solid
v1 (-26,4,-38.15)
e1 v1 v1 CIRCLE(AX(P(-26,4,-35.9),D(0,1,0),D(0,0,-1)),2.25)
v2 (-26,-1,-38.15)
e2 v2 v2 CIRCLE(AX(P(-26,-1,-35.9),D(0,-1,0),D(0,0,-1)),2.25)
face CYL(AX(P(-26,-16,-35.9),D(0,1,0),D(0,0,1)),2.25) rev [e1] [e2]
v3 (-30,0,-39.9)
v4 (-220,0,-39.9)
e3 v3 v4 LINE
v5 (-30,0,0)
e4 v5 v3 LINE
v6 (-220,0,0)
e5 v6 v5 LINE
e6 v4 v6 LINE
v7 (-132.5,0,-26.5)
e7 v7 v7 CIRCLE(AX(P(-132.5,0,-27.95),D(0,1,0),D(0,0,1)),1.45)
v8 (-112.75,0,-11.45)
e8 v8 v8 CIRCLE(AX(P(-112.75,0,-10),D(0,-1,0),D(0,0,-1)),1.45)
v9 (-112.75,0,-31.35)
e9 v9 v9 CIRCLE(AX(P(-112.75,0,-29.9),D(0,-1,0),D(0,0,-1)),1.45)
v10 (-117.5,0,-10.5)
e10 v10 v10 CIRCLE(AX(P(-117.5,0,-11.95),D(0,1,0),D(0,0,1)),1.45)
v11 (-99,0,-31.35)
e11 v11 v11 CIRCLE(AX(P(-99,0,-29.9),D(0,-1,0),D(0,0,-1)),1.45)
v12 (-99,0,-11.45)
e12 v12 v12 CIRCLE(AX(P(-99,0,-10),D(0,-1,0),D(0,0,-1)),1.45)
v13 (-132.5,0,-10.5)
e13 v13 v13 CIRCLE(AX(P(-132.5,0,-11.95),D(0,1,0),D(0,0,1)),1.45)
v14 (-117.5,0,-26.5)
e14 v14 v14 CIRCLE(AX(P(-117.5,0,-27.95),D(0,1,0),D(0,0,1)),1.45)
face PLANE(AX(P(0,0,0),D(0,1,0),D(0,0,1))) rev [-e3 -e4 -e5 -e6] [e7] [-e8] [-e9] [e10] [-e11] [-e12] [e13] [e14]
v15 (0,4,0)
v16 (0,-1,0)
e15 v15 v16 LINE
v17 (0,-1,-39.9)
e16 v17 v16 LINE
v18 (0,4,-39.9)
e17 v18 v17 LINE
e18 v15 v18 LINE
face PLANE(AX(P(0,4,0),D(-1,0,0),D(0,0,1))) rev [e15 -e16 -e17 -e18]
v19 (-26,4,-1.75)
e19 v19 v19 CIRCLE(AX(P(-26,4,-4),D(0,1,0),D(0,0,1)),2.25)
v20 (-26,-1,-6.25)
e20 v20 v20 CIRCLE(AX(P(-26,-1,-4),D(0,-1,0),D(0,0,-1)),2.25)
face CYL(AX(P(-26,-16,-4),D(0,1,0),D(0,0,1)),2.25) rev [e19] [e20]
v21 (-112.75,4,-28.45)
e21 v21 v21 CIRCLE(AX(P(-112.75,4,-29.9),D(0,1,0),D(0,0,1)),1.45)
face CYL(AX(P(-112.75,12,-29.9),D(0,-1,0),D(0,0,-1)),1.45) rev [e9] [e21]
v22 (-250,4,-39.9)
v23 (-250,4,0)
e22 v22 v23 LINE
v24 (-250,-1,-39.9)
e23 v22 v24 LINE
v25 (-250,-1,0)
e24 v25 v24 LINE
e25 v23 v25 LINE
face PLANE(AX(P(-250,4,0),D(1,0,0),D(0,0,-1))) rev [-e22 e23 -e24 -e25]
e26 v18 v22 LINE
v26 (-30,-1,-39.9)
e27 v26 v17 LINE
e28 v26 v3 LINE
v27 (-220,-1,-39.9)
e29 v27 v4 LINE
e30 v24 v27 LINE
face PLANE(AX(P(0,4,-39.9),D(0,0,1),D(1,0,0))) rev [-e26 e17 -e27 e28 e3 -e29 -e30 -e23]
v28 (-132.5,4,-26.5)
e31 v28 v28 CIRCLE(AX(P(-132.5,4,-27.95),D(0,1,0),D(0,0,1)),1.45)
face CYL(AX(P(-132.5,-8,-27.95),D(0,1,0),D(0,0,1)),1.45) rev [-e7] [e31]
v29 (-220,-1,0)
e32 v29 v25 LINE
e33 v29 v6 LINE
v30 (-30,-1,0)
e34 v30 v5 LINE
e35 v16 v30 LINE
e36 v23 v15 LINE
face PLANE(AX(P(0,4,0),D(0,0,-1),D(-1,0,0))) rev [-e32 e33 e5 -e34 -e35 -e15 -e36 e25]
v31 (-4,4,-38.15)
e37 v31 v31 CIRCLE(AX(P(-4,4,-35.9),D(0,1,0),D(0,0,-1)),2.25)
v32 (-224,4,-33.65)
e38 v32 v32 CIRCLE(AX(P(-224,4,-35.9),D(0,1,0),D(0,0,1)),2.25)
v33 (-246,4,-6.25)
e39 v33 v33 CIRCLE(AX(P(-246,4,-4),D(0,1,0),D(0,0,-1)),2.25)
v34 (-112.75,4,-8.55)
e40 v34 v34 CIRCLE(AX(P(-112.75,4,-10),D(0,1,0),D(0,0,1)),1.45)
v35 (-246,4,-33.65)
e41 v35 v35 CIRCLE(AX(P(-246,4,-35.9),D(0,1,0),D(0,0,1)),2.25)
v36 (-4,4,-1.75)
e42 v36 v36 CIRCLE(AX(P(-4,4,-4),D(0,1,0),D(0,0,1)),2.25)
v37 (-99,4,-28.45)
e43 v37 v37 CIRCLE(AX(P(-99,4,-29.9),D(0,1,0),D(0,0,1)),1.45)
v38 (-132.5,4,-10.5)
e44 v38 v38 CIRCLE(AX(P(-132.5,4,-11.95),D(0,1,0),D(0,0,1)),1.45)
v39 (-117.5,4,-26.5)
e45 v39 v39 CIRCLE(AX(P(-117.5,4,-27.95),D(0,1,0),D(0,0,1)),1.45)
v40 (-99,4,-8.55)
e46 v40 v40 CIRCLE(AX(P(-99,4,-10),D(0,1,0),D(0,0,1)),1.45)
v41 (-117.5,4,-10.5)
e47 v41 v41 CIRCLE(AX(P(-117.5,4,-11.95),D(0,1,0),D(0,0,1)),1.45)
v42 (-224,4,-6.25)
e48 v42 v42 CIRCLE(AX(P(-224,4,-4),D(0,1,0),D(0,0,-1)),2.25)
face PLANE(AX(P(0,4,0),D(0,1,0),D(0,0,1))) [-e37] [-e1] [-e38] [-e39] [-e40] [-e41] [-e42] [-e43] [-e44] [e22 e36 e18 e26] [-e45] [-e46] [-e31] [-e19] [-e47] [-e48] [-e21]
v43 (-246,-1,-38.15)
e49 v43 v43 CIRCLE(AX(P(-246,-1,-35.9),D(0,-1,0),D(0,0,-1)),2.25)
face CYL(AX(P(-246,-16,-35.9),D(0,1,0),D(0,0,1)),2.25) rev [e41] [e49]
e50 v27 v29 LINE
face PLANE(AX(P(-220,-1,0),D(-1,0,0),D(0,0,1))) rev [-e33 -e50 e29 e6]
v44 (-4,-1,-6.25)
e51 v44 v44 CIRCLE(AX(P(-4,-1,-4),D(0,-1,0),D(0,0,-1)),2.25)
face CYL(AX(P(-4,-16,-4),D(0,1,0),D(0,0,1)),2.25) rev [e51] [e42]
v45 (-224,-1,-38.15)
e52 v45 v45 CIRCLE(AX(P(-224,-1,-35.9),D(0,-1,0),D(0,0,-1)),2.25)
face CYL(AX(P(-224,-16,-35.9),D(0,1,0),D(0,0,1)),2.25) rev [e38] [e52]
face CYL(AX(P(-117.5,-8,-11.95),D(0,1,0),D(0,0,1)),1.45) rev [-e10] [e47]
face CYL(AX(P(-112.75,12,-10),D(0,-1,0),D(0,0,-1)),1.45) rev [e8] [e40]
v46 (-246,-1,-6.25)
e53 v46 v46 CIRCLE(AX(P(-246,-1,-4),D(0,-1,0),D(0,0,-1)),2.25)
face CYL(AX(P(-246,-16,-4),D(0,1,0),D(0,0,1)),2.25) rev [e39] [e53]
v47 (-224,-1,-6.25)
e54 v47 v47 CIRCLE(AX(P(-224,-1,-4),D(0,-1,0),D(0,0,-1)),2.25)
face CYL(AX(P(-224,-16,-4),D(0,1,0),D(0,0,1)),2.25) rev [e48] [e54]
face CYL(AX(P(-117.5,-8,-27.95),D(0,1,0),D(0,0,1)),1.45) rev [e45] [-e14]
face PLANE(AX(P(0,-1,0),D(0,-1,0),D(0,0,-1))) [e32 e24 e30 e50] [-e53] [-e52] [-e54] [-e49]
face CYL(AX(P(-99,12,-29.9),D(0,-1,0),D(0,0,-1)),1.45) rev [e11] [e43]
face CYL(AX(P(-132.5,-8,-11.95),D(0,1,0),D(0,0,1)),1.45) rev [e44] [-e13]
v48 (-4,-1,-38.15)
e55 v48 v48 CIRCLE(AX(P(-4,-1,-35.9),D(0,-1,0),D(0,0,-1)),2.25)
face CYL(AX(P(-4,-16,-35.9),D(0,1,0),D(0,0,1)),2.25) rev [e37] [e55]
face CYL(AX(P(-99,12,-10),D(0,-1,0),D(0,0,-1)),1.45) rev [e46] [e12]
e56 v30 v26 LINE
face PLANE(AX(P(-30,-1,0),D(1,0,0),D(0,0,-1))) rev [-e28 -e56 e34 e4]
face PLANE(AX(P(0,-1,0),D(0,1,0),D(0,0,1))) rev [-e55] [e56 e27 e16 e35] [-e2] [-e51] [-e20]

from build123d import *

# Parameters (mm, degrees)
SKETCH_1_W          = 250
SKETCH_1_H          = 39.9
EXTRUDE_1_DEPTH     = 4
SKETCH_2_R          = 1.45
CUT_EXTRUDE_1_DEPTH = 12
SKETCH_3_R          = 1.45
CUT_EXTRUDE_2_DEPTH = 12
SKETCH_7_R          = 2.25
CUT_EXTRUDE_6_DEPTH = 20
SKETCH_8_W          = 30
SKETCH_8_H          = 39.9
SKETCH_8_R          = 2.25
EXTRUDE_2_DEPTH     = 1


with BuildPart() as part:
    # 草图1 → 凸台-拉伸1 (new body)
    with BuildSketch(Plane(origin=(0, 0, 0), x_dir=(1, 0, 0), z_dir=(0, 1, 0))):
        with Locations((-125, 19.95)):
            Rectangle(SKETCH_1_W, SKETCH_1_H)
    extrude(amount=EXTRUDE_1_DEPTH)

    # 草图2 → 切除-拉伸1 (cut)
    with BuildSketch(Plane(origin=(0, 4, 0), x_dir=(1, 0, 0), z_dir=(0, 1, 0))):
        with Locations((-132.5, 27.95)):
            Circle(SKETCH_2_R)
        with Locations((-117.5, 27.95)):
            Circle(SKETCH_2_R)
        with Locations((-117.5, 11.95)):
            Circle(SKETCH_2_R)
        with Locations((-132.5, 11.95)):
            Circle(SKETCH_2_R)
    extrude(amount=-CUT_EXTRUDE_1_DEPTH, mode=Mode.SUBTRACT)

    # 草图3 → 切除-拉伸2 (cut)
    with BuildSketch(Plane(origin=(-275.091791604, 0, 105.376222054), x_dir=(-0.9999983055135633, 0, 0.0018409155336922224), z_dir=(0, -1, 0))):
        with Locations((-162.553914397, 115.077169025)):
            Circle(SKETCH_3_R)
        with Locations((-162.590548616, 134.977135305)):
            Circle(SKETCH_3_R)
        with Locations((-176.303891098, 115.051856436)):
            Circle(SKETCH_3_R)
        with Locations((-176.340525317, 134.951822716)):
            Circle(SKETCH_3_R)
    extrude(amount=-CUT_EXTRUDE_2_DEPTH, mode=Mode.SUBTRACT)

    # 草图7 → 切除-拉伸6 (cut)
    with BuildSketch(Plane(origin=(0, 4, 0), x_dir=(1, 0, 0), z_dir=(0, 1, 0))):
        with Locations((-246, 35.9)):
            Circle(SKETCH_7_R)
        with Locations((-224, 35.9)):
            Circle(SKETCH_7_R)
        with Locations((-224, 4)):
            Circle(SKETCH_7_R)
        with Locations((-246, 4)):
            Circle(SKETCH_7_R)
        with Locations((-4, 4)):
            Circle(SKETCH_7_R)
        with Locations((-26, 4)):
            Circle(SKETCH_7_R)
        with Locations((-26, 35.9)):
            Circle(SKETCH_7_R)
        with Locations((-4, 35.9)):
            Circle(SKETCH_7_R)
    extrude(amount=-CUT_EXTRUDE_6_DEPTH, mode=Mode.SUBTRACT)

    # 草图8 → 凸台-拉伸2 (add)
    # profile 1 of 2: a face of its own
    with BuildSketch(Plane.XZ):
        with Locations((-235, -19.95)):
            Rectangle(SKETCH_8_W, SKETCH_8_H)
        with Locations((-224, -35.9)):
            Circle(SKETCH_8_R, mode=Mode.SUBTRACT)
        with Locations((-246, -35.9)):
            Circle(SKETCH_8_R, mode=Mode.SUBTRACT)
        with Locations((-224, -4)):
            Circle(SKETCH_8_R, mode=Mode.SUBTRACT)
        with Locations((-246, -4)):
            Circle(SKETCH_8_R, mode=Mode.SUBTRACT)
    # profile 2 of 2: a face of its own
    with BuildSketch(Plane.XZ):
        with Locations((-15, -19.95)):
            Rectangle(SKETCH_8_W, SKETCH_8_H)
        with Locations((-4, -35.9)):
            Circle(SKETCH_8_R, mode=Mode.SUBTRACT)
        with Locations((-26, -35.9)):
            Circle(SKETCH_8_R, mode=Mode.SUBTRACT)
        with Locations((-4, -4)):
            Circle(SKETCH_8_R, mode=Mode.SUBTRACT)
        with Locations((-26, -4)):
            Circle(SKETCH_8_R, mode=Mode.SUBTRACT)
    extrude(amount=EXTRUDE_2_DEPTH)


solid = part.part
